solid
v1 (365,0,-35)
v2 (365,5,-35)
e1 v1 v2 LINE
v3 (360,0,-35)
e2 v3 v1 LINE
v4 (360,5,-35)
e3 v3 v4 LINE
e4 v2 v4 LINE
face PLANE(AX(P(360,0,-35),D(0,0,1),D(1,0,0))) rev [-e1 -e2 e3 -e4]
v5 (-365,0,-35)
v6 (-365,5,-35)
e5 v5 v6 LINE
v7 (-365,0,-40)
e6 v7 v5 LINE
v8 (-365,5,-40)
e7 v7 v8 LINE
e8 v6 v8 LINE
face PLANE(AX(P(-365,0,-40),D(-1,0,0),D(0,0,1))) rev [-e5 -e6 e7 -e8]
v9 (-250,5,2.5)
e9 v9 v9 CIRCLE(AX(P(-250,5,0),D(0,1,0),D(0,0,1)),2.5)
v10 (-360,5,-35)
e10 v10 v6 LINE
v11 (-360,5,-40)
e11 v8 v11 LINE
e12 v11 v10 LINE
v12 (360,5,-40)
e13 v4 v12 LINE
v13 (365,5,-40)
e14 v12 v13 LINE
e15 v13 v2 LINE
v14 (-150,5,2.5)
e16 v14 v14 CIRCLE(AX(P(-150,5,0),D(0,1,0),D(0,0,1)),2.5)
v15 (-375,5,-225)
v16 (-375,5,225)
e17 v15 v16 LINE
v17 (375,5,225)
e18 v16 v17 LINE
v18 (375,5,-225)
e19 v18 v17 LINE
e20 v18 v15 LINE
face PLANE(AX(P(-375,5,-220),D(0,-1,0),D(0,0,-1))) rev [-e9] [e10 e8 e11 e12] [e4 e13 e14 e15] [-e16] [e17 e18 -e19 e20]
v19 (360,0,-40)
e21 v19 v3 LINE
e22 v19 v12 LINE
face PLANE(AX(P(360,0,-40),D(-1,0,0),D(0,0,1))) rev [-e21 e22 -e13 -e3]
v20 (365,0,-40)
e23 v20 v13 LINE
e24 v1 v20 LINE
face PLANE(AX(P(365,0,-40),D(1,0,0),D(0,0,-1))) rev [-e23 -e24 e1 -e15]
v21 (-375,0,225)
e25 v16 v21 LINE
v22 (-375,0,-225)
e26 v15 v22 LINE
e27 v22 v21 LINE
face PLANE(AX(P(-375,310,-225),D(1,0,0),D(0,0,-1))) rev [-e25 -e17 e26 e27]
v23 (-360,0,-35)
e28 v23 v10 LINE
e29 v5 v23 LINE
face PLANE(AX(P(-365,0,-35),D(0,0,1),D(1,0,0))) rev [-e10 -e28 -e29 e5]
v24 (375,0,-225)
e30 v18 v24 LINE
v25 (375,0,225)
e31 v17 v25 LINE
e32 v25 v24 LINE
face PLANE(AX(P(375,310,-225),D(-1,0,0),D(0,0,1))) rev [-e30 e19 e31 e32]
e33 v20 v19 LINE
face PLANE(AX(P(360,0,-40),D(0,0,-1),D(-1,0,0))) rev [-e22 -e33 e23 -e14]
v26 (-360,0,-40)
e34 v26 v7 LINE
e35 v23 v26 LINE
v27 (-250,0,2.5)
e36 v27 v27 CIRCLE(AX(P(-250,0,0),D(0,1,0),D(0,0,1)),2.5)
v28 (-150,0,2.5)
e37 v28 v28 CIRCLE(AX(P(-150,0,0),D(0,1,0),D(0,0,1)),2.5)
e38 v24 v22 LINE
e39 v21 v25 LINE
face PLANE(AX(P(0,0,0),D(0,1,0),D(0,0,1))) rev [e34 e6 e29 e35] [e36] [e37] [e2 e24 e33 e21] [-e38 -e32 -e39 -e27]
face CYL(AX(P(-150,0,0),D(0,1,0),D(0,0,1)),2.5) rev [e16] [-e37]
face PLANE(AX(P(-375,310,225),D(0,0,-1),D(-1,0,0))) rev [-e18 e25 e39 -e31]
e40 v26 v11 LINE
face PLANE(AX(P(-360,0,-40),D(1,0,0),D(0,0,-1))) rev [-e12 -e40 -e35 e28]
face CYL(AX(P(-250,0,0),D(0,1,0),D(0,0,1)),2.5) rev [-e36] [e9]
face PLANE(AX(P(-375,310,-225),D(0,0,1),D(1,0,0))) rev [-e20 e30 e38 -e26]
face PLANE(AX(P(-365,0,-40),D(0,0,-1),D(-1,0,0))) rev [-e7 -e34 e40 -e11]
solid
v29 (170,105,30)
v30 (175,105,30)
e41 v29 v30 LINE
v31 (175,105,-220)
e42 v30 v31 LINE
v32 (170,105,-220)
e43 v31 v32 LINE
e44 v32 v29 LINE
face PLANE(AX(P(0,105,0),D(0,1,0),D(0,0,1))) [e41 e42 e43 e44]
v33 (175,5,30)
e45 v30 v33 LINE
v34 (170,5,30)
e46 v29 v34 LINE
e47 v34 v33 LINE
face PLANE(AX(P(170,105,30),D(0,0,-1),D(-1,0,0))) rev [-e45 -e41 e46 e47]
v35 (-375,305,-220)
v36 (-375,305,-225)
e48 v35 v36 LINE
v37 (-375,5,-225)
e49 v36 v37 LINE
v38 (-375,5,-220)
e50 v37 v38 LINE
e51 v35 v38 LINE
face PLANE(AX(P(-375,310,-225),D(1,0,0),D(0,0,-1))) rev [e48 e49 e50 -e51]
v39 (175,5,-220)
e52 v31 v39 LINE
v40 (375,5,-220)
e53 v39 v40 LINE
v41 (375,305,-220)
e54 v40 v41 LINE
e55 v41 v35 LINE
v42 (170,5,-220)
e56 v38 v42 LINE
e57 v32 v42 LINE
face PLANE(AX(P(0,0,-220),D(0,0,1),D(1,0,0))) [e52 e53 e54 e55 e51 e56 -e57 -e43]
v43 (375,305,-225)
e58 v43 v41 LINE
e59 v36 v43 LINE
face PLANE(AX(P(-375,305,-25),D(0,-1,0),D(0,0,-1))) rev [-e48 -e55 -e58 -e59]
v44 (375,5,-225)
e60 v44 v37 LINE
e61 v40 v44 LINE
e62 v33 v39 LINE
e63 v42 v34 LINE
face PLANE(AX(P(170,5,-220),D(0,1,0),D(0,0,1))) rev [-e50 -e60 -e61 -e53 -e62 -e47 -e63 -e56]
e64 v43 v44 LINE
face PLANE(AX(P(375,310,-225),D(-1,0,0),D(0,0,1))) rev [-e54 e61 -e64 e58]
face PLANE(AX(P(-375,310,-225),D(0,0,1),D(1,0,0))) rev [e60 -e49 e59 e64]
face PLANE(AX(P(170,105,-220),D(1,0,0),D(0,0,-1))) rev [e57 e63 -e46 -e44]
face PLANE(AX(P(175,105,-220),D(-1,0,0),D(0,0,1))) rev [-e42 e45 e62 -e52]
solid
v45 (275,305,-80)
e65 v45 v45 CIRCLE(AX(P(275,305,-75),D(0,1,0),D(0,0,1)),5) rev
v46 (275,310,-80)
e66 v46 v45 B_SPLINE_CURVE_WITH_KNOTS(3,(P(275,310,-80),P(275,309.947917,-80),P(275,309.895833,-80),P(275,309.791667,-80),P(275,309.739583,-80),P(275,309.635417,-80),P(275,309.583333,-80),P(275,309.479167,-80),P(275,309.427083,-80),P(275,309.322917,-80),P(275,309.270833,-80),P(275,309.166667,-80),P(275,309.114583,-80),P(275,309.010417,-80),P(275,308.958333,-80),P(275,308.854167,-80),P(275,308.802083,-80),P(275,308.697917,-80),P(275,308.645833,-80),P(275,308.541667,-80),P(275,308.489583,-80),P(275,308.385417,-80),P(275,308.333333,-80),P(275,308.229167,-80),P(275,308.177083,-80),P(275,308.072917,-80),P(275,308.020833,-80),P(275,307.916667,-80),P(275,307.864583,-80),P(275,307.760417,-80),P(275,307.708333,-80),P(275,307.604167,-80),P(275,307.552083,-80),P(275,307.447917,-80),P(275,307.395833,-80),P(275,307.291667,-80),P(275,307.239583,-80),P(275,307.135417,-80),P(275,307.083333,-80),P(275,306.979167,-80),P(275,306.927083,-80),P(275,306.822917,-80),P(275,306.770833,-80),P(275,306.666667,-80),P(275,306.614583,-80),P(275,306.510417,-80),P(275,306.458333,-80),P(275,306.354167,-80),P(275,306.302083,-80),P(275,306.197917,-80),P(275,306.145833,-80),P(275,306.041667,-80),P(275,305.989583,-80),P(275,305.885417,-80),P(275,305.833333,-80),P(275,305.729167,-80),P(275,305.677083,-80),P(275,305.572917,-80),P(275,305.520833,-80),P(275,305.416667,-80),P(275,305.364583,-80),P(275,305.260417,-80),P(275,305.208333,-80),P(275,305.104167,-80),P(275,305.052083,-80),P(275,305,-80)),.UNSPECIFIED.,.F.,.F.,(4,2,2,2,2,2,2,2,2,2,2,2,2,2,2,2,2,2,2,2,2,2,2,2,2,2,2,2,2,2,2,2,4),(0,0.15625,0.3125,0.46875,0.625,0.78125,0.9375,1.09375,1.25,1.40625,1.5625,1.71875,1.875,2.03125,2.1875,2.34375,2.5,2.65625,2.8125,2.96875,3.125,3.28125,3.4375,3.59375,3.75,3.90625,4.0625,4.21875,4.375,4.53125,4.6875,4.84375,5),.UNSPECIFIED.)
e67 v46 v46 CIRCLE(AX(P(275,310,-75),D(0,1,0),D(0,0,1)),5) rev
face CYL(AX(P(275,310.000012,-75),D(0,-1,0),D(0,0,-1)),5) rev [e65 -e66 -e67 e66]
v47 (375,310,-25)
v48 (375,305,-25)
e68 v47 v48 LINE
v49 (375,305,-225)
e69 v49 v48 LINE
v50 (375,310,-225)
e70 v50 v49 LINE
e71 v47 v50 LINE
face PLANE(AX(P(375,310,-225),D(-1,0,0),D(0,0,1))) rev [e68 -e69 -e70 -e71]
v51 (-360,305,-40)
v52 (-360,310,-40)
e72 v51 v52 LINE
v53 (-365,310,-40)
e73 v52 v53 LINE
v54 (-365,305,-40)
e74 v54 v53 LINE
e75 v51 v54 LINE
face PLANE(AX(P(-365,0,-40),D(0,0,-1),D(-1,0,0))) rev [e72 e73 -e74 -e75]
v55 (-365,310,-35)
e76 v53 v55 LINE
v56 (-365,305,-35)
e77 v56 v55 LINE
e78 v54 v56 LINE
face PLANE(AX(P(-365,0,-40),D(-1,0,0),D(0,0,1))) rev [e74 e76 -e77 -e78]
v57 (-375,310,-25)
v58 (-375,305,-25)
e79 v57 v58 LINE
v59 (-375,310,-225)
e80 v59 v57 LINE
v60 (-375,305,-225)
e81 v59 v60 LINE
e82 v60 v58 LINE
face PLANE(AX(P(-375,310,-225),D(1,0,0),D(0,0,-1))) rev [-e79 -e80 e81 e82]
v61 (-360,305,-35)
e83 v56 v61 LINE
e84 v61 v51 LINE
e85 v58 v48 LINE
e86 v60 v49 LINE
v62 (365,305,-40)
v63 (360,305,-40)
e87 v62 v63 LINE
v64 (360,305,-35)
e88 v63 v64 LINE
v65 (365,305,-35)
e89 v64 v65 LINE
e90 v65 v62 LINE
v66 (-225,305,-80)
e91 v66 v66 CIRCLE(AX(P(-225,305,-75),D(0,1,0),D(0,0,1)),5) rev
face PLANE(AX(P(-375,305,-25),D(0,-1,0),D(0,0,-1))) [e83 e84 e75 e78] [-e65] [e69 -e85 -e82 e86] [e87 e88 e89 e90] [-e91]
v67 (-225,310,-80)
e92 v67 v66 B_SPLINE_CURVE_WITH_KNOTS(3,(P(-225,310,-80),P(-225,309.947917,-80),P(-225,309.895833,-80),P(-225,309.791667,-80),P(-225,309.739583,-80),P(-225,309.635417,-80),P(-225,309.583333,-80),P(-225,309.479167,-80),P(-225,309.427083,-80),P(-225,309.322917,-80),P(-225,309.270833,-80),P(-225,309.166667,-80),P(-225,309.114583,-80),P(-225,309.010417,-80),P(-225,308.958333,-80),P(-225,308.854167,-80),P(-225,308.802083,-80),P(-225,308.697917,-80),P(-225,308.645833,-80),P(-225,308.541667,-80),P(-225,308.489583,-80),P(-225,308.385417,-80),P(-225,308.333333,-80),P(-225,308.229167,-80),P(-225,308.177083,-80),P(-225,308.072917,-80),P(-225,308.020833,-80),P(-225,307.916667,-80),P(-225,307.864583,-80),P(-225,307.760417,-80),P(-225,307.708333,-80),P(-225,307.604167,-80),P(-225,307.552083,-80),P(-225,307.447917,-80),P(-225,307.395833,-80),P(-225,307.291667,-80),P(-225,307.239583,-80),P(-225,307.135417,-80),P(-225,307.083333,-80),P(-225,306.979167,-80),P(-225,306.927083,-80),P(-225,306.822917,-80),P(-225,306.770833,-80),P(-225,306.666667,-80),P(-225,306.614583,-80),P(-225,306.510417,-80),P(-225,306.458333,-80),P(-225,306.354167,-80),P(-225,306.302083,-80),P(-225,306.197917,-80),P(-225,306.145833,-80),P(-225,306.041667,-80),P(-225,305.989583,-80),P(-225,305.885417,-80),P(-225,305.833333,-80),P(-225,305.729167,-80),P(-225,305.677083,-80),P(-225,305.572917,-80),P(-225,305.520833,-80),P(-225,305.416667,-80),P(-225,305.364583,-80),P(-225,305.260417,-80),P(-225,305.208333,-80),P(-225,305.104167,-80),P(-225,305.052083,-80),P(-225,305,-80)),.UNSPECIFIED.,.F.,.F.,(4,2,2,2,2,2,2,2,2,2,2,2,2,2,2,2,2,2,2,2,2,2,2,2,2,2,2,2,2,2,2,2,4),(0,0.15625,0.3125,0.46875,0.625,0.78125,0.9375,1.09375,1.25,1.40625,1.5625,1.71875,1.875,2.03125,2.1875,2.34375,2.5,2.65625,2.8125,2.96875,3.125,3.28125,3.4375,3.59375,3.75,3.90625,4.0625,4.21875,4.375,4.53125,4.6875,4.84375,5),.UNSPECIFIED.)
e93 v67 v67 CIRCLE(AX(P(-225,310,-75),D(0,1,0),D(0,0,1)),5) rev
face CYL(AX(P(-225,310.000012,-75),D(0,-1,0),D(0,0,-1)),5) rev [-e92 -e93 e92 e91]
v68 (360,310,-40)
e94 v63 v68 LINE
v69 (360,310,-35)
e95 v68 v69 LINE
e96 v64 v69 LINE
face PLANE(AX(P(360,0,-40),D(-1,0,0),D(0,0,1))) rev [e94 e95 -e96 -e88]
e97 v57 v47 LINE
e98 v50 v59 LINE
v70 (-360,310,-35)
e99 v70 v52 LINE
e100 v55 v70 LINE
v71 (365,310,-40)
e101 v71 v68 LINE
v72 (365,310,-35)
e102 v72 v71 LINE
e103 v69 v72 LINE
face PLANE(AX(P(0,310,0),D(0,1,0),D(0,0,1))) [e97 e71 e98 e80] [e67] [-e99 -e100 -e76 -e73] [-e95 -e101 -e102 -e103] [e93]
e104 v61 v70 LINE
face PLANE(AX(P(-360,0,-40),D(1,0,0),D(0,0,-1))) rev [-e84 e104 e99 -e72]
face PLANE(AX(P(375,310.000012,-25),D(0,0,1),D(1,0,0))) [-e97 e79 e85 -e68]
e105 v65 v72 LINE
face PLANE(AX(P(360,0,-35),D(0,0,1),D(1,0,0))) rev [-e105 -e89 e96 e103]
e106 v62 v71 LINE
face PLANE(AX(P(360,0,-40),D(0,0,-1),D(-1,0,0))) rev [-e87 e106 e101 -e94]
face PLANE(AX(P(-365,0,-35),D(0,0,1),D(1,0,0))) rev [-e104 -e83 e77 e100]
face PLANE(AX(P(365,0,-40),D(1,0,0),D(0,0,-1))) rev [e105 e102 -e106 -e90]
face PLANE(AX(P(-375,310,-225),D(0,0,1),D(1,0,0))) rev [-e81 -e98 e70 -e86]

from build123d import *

# Parameters (mm, degrees)
SKETCH1_W               = 750
SKETCH1_H               = 450
BOSS_EXTRUDE1_DEPTH     = 310
SKETCH8_W               = 750
SKETCH8_H               = 300
CUT_EXTRUDE1_DEPTH      = 445
SKETCH15_W              = 5
SKETCH15_H              = 250
BOSS_EXTRUDE8_DEPTH     = 100
CUT_EXTRUDE2_DEPTH      = 537.050370768
CUT_EXTRUDE2_DEPTH_BACK = 10
SKETCH16_R              = 5
SKETCH16_W              = 750
SKETCH16_H              = 250
SKETCH18_W              = 5
SKETCH18_H              = 5
CUT_EXTRUDE3_DEPTH      = 537.050370768
SKETCH10_R              = 2.5
CUT_EXTRUDE4_DEPTH      = 534.174455502
SPLIT1_START            = 305
SPLIT1_OUTLINE_W        = 750
SPLIT1_OUTLINE_H        = 200
SPLIT1_OUTLINE_W_2      = 5
SPLIT1_OUTLINE_H_2      = 5
SPLIT1_OUTLINE_R        = 5
SPLIT1_DEPTH            = 5
SPLIT1_2_OUTLINE_W      = 750
SPLIT1_2_OUTLINE_H      = 450
SPLIT1_2_OUTLINE_W_2    = 5
SPLIT1_2_OUTLINE_H_2    = 5
SPLIT1_2_OUTLINE_R      = 2.5
SPLIT1_2_DEPTH          = 5
SPLIT1_3_OUTLINE_W      = 750
SPLIT1_3_OUTLINE_H      = 200
SPLIT1_3_OUTLINE_W_2    = 5
SPLIT1_3_OUTLINE_H_2    = 5
SPLIT1_3_OUTLINE_R      = 5
SPLIT1_3_DEPTH          = 5
SPLIT1_4_OUTLINE_W      = 750
SPLIT1_4_OUTLINE_H      = 450
SPLIT1_4_OUTLINE_W_2    = 5
SPLIT1_4_OUTLINE_H_2    = 5
SPLIT1_4_OUTLINE_R      = 2.5
SPLIT1_4_DEPTH          = 5


# Read off the part's stored shape, not the designer's step: Split1
with BuildPart() as part:
    # Sketch1 → Boss-Extrude1 (new body)
    with BuildSketch(Plane(origin=(0, 0, 0), x_dir=(1, 0, 0), z_dir=(0, 1, 0))):
        Rectangle(SKETCH1_W, SKETCH1_H)
    extrude(amount=BOSS_EXTRUDE1_DEPTH)

    # Sketch8 → Cut-Extrude1 (cut)
    with BuildSketch(Plane.XY.offset(225)):
        with Locations((0, 155)):
            Rectangle(SKETCH8_W, SKETCH8_H)
    extrude(amount=-CUT_EXTRUDE1_DEPTH, mode=Mode.SUBTRACT)

    # Sketch15 → Boss-Extrude8 (add)
    with BuildSketch(Plane(origin=(0, 5, 0), x_dir=(1, 0, 0), z_dir=(0, 1, 0))):
        with Locations((172.5, 95)):
            Rectangle(SKETCH15_W, SKETCH15_H)
    extrude(amount=BOSS_EXTRUDE8_DEPTH)

    # Sketch16 → Cut-Extrude2 (cut, two sides: drawn at the far end of the back side and taken through both)
    with BuildSketch(Plane(origin=(0, 310, 0), x_dir=(1, 0, 0), z_dir=(0, 1, 0)).offset(-CUT_EXTRUDE2_DEPTH_BACK)):
        with Locations(Location((275, 75, 0), (0, 0, 90))):
            Circle(SKETCH16_R)
        with Locations(Location((-225, 75, 0), (0, 0, 90))):
            Circle(SKETCH16_R)
        with Locations((0, -100)):
            Rectangle(SKETCH16_W, SKETCH16_H)
    extrude(amount=CUT_EXTRUDE2_DEPTH + CUT_EXTRUDE2_DEPTH_BACK, mode=Mode.SUBTRACT)

    # Sketch18 → Cut-Extrude3 (cut, through all)
    with BuildSketch(Plane(origin=(0, 310, 0), x_dir=(1, 0, 0), z_dir=(0, 1, 0))):
        with Locations((-362.5, 37.5)):
            Rectangle(SKETCH18_W, SKETCH18_H)
        with Locations((362.5, 37.5)):
            Rectangle(SKETCH18_W, SKETCH18_H)
    extrude(amount=-CUT_EXTRUDE3_DEPTH, mode=Mode.SUBTRACT)

    # Sketch10 → Cut-Extrude4 (cut, through all)
    with BuildSketch(Plane(origin=(0, 5, 0), x_dir=(1, 0, 0), z_dir=(0, 1, 0))):
        with Locations(Location((-250, 0, 0), (0, 0, 270))):
            Circle(SKETCH10_R)
        with Locations(Location((-150, 0, 0), (0, 0, 270))):
            Circle(SKETCH10_R)
    extrude(amount=-CUT_EXTRUDE4_DEPTH, mode=Mode.SUBTRACT)

    # Split1 2 outline → Split1 2 (cut)
    with BuildSketch(Plane(origin=(0, 0, 0), x_dir=(1, 0, 0), z_dir=(0, 1, 0))):
        Rectangle(SPLIT1_2_OUTLINE_W, SPLIT1_2_OUTLINE_H)
        with Locations((-362.5, 37.5)):
            Rectangle(SPLIT1_2_OUTLINE_W_2, SPLIT1_2_OUTLINE_H_2, mode=Mode.SUBTRACT)
        with Locations((362.5, 37.5)):
            Rectangle(SPLIT1_2_OUTLINE_W_2, SPLIT1_2_OUTLINE_H_2, mode=Mode.SUBTRACT)
        with Locations((-150, 0)):
            Circle(SPLIT1_2_OUTLINE_R, mode=Mode.SUBTRACT)
        with Locations((-250, 0)):
            Circle(SPLIT1_2_OUTLINE_R, mode=Mode.SUBTRACT)
    extrude(amount=SPLIT1_2_DEPTH, mode=Mode.SUBTRACT)

    # Split1 3 outline → Split1 3 (cut)
    with BuildSketch(Plane(origin=(0, 0, 0), x_dir=(1, 0, 0), z_dir=(0, 1, 0)).offset(SPLIT1_START)):
        with Locations((0, 125)):
            Rectangle(SPLIT1_3_OUTLINE_W, SPLIT1_3_OUTLINE_H)
        with Locations((-362.5, 37.5)):
            Rectangle(SPLIT1_3_OUTLINE_W_2, SPLIT1_3_OUTLINE_H_2, mode=Mode.SUBTRACT)
        with Locations((-225, 75)):
            Circle(SPLIT1_3_OUTLINE_R, mode=Mode.SUBTRACT)
        with Locations((362.5, 37.5)):
            Rectangle(SPLIT1_3_OUTLINE_W_2, SPLIT1_3_OUTLINE_H_2, mode=Mode.SUBTRACT)
        with Locations((275, 75)):
            Circle(SPLIT1_3_OUTLINE_R, mode=Mode.SUBTRACT)
    extrude(amount=SPLIT1_3_DEPTH, mode=Mode.SUBTRACT)


with BuildPart() as body_2:
    # Split1 outline → Split1 (new body)
    with BuildSketch(Plane(origin=(0, 0, 0), x_dir=(1, 0, 0), z_dir=(0, 1, 0)).offset(SPLIT1_START)):
        with Locations((0, 125)):
            Rectangle(SPLIT1_OUTLINE_W, SPLIT1_OUTLINE_H)
        with Locations((-362.5, 37.5)):
            Rectangle(SPLIT1_OUTLINE_W_2, SPLIT1_OUTLINE_H_2, mode=Mode.SUBTRACT)
        with Locations((-225, 75)):
            Circle(SPLIT1_OUTLINE_R, mode=Mode.SUBTRACT)
        with Locations((362.5, 37.5)):
            Rectangle(SPLIT1_OUTLINE_W_2, SPLIT1_OUTLINE_H_2, mode=Mode.SUBTRACT)
        with Locations((275, 75)):
            Circle(SPLIT1_OUTLINE_R, mode=Mode.SUBTRACT)
    extrude(amount=SPLIT1_DEPTH)


with BuildPart() as body_3:
    # Split1 4 outline → Split1 4 (new body)
    with BuildSketch(Plane(origin=(0, 0, 0), x_dir=(1, 0, 0), z_dir=(0, 1, 0))):
        Rectangle(SPLIT1_4_OUTLINE_W, SPLIT1_4_OUTLINE_H)
        with Locations((-362.5, 37.5)):
            Rectangle(SPLIT1_4_OUTLINE_W_2, SPLIT1_4_OUTLINE_H_2, mode=Mode.SUBTRACT)
        with Locations((-250, 0)):
            Circle(SPLIT1_4_OUTLINE_R, mode=Mode.SUBTRACT)
        with Locations((-150, 0)):
            Circle(SPLIT1_4_OUTLINE_R, mode=Mode.SUBTRACT)
        with Locations((362.5, 37.5)):
            Rectangle(SPLIT1_4_OUTLINE_W_2, SPLIT1_4_OUTLINE_H_2, mode=Mode.SUBTRACT)
    extrude(amount=SPLIT1_4_DEPTH)


solid = Compound([part.part, body_2.part, body_3.part])
